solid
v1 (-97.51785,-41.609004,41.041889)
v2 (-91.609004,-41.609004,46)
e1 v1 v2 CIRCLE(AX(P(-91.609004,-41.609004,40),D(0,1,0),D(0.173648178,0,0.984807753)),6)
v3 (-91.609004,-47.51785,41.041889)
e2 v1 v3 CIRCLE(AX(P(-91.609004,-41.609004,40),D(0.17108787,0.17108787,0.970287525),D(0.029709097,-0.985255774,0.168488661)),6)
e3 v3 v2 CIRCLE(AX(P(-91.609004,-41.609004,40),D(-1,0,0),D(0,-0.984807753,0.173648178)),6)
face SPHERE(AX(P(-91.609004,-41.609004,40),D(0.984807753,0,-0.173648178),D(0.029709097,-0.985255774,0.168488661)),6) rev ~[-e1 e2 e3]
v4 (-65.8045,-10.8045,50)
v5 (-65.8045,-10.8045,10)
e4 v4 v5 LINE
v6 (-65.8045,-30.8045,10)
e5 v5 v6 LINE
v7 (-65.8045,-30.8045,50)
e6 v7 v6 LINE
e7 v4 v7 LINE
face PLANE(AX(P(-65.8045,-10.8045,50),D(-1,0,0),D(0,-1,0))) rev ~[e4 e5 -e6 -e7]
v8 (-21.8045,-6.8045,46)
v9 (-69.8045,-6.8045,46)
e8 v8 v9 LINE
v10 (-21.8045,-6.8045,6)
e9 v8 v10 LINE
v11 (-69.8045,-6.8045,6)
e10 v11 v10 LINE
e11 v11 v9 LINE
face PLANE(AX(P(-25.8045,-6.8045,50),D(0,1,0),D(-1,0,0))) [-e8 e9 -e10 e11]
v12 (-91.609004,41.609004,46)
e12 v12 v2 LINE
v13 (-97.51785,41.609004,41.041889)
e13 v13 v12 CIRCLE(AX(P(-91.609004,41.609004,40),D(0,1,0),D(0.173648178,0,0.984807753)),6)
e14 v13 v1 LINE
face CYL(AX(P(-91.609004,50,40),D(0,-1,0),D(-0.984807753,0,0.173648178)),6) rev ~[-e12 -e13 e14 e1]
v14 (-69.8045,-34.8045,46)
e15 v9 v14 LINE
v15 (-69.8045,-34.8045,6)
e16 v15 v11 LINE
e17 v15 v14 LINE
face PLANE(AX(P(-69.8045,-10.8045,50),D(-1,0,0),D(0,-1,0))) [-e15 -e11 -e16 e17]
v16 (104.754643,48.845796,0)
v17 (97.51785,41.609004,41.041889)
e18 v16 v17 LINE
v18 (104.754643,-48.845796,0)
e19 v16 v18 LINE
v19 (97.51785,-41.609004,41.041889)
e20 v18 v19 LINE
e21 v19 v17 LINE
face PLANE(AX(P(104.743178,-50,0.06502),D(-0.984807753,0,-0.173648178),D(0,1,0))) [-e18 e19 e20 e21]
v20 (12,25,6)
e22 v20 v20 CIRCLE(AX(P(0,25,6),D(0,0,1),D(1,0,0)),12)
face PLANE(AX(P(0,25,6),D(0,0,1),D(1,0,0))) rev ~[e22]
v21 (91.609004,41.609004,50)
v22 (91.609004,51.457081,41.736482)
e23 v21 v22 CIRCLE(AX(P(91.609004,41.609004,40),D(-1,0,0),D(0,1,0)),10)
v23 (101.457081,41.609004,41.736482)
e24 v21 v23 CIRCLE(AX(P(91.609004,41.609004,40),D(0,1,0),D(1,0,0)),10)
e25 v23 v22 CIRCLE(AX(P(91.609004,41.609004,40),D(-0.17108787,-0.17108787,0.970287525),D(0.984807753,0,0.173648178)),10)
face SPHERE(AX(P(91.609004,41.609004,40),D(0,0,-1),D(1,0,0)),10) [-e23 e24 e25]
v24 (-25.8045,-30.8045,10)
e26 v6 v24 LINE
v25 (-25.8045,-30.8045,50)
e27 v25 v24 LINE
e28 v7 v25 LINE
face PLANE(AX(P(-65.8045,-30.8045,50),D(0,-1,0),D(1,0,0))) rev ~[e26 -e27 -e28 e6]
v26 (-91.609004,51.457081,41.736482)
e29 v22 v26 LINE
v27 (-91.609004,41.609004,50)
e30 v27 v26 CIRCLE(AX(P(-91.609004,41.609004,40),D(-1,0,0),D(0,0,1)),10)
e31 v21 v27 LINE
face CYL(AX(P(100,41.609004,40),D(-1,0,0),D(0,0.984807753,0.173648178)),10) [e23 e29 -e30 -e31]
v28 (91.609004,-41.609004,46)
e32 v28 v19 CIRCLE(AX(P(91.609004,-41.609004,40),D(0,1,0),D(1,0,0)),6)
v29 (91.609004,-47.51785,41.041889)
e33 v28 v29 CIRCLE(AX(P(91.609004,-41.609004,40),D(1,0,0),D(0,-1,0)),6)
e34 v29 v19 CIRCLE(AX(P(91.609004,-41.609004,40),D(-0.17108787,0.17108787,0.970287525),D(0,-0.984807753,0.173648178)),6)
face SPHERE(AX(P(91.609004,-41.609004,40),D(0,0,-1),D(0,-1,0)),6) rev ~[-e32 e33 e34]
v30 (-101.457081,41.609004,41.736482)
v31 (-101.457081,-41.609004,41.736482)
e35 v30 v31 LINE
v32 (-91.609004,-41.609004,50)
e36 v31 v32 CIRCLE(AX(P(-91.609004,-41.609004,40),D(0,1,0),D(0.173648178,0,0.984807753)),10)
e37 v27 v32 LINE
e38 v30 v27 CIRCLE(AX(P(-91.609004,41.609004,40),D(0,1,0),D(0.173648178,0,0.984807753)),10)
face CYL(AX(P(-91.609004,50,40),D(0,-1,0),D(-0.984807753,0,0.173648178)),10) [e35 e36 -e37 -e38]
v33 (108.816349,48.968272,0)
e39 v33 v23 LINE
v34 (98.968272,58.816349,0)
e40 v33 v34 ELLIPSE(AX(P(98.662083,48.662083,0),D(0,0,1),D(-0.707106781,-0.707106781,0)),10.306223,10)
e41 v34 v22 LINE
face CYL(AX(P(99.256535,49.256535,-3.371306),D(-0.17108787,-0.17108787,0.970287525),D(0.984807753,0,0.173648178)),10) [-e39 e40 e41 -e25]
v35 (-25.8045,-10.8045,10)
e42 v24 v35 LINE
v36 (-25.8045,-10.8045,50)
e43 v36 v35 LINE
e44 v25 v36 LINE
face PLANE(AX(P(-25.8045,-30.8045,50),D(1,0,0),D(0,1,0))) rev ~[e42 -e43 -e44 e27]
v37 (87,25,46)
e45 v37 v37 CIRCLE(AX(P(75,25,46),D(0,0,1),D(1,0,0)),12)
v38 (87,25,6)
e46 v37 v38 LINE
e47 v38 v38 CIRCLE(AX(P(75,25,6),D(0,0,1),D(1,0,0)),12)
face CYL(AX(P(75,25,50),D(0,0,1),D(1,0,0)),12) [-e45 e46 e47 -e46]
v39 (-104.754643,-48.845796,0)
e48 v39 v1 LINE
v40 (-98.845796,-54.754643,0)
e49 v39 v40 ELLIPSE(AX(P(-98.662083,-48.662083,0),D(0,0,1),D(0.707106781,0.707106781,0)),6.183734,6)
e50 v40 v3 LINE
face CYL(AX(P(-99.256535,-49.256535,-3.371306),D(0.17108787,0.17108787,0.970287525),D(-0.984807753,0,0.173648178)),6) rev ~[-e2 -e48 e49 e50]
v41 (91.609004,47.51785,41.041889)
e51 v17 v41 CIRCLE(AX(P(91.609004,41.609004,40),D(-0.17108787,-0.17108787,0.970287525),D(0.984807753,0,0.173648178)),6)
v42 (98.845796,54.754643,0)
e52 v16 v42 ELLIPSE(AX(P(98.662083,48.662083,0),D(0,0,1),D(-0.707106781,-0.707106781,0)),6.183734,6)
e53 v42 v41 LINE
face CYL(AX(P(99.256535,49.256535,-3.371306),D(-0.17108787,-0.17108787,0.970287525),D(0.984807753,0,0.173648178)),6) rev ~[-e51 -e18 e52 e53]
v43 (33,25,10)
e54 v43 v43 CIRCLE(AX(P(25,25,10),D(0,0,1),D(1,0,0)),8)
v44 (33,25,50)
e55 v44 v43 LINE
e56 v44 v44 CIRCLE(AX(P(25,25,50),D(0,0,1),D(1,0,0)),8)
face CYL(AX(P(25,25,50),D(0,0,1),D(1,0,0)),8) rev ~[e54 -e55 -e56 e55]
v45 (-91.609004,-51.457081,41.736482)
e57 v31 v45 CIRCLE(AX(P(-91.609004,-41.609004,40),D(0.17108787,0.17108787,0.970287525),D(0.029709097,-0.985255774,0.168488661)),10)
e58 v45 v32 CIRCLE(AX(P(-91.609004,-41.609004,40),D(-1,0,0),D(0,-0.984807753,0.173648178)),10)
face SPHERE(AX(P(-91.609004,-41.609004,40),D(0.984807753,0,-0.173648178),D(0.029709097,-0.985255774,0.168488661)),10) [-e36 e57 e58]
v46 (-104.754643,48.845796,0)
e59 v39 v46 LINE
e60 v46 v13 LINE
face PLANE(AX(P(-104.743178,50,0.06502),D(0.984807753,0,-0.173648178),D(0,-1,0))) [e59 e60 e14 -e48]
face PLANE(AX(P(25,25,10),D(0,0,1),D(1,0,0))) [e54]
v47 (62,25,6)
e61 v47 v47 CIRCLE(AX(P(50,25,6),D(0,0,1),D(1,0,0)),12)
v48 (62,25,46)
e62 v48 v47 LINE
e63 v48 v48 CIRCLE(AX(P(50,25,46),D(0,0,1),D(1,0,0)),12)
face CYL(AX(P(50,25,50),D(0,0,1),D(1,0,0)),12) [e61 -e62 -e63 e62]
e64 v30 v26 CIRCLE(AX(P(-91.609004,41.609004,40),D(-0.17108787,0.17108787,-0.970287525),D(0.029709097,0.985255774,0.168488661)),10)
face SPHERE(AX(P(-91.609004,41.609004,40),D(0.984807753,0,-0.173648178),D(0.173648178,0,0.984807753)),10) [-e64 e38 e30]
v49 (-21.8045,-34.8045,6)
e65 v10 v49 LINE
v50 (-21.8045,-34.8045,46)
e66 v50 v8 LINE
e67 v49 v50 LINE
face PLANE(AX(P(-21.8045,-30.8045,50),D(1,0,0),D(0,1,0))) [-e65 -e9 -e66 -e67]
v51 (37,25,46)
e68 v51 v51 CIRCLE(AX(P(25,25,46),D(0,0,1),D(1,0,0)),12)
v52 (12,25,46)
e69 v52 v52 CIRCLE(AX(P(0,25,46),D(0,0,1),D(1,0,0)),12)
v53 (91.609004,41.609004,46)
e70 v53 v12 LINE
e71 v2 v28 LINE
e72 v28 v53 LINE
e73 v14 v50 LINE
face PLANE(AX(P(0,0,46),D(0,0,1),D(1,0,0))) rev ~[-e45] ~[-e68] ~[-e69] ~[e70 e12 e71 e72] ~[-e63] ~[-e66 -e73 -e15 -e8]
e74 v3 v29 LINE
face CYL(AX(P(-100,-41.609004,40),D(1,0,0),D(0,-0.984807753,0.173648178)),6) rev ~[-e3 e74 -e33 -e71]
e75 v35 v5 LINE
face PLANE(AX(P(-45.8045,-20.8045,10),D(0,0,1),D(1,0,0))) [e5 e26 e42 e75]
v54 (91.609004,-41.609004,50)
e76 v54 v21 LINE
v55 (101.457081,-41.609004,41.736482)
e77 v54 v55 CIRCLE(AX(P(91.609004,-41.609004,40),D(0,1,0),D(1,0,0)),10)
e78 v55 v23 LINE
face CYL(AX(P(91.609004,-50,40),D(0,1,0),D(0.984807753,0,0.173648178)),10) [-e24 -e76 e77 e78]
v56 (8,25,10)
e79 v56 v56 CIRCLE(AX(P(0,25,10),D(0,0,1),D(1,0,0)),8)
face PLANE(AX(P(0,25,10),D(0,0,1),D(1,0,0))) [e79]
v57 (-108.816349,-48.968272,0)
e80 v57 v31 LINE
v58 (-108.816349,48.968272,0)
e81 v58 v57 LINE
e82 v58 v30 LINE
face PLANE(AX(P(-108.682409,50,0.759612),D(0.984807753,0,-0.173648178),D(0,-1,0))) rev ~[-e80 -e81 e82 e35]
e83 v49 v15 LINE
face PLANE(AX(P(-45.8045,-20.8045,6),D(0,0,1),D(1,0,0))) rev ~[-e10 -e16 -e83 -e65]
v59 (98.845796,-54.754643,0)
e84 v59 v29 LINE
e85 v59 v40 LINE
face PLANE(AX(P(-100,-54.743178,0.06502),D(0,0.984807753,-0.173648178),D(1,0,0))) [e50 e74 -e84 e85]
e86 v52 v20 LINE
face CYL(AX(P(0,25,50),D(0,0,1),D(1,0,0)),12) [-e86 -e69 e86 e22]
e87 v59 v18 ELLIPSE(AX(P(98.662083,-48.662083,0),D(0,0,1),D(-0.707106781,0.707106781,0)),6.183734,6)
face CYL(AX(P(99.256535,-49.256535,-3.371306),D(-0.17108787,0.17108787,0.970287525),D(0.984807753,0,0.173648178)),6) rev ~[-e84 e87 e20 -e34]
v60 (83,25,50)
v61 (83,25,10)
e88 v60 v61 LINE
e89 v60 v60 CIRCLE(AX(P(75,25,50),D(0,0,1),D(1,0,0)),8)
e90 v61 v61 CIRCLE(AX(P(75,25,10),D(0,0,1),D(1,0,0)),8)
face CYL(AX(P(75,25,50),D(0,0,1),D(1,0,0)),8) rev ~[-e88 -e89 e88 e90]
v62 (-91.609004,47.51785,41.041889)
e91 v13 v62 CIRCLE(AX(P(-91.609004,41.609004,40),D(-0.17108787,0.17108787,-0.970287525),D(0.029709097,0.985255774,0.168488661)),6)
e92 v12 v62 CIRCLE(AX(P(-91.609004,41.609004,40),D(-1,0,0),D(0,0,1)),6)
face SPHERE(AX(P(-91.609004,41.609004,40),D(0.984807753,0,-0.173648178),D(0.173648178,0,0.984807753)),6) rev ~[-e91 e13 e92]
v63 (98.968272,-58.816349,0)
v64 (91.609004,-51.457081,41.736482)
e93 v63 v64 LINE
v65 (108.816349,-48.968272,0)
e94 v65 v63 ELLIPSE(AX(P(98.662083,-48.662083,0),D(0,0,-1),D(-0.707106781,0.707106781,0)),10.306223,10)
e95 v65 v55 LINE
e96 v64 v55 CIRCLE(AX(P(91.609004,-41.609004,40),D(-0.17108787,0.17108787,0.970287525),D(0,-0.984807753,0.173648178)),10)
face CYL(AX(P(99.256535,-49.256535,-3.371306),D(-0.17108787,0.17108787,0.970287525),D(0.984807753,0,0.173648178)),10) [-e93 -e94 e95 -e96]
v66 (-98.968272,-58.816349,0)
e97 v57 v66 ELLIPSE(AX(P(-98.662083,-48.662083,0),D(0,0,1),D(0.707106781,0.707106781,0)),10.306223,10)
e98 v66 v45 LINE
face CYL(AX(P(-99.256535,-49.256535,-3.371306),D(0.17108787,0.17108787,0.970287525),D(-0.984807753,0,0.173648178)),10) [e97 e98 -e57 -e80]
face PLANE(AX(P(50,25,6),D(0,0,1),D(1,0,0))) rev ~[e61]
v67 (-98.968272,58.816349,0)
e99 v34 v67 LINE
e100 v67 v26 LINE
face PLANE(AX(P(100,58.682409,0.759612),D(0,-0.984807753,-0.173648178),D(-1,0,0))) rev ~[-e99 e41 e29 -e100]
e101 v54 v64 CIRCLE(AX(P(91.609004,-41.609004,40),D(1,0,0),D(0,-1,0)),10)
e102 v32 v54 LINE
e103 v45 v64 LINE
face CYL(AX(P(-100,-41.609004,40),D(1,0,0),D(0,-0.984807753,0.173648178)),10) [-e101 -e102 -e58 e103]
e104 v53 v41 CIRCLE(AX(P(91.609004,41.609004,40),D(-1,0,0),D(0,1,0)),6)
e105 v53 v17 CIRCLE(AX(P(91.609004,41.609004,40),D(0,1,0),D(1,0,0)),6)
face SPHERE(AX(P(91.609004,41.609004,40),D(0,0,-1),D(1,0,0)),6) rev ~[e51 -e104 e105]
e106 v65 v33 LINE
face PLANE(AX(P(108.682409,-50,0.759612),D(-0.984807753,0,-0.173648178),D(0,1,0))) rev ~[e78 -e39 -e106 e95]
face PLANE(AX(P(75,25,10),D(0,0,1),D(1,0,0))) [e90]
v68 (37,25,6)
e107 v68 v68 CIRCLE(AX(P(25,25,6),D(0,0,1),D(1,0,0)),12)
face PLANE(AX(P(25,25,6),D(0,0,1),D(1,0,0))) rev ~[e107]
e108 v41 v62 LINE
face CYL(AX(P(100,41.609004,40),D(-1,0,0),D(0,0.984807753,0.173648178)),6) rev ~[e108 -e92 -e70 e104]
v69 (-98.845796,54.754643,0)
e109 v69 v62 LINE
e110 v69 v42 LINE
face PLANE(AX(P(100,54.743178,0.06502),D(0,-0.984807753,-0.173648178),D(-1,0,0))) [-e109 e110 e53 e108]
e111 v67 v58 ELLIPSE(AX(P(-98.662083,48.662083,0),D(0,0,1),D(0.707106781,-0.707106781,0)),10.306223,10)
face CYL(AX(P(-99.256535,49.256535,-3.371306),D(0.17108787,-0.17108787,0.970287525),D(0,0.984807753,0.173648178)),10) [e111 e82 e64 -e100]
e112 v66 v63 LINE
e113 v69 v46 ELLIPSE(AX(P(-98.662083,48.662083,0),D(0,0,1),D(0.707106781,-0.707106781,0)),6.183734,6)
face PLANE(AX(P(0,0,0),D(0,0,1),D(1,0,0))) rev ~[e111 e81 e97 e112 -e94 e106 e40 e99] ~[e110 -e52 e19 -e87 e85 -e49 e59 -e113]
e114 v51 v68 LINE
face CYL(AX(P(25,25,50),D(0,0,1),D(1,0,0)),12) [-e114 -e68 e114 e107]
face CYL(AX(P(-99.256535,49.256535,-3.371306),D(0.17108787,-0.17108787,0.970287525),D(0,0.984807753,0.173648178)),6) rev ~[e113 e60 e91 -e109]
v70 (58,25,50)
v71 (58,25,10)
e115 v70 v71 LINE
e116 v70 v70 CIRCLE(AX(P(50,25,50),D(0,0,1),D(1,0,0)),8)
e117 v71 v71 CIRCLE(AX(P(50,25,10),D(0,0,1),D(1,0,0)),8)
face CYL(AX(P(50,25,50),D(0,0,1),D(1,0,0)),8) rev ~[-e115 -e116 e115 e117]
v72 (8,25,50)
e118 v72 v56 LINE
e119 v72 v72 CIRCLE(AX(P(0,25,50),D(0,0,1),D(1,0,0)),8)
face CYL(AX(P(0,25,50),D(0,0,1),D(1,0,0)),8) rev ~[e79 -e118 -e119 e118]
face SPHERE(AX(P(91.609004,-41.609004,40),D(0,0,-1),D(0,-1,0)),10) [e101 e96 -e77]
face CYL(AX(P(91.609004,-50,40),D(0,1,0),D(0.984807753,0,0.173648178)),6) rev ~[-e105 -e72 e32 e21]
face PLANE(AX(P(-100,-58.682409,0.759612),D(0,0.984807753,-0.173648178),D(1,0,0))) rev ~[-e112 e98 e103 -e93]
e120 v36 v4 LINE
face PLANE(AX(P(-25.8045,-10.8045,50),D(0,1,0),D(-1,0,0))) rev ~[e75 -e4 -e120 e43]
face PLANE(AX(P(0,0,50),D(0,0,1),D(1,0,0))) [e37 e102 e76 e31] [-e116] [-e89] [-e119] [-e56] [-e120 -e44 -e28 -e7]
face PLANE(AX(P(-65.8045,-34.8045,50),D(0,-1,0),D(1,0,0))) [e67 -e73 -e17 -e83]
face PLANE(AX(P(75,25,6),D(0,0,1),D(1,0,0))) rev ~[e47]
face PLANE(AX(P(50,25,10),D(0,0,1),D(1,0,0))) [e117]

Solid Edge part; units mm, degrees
sketch "Sketch1" plane through (0, 0, 0) normal (0, 0, 1) x (1, 0, 0)
  line L0 (100, -50) -> (100, 50)
  line L1 (100, 50) -> (-100, 50)
  line L2 (-100, 50) -> (-100, -50)
  line L3 (-100, -50) -> (100, -50)
extrude "Protrusion1" add sketch "Sketch1" along normal blind 50
draft "Draft_1" angle 10 neutral plane through (0, 0, 50) normal (0, 0, 1) pull direction (0, 0, 1) face at (-68.6667, -50, 41.1667) face at (100, -34.3333, 41.1667) face at (68.6667, 50, 41.1667) face at (-100, 34.3333, 41.1667)
fillet "Round_1" radius 10 8 edges at (104.4082, -54.4082, 25) (104.4082, 54.4082, 25) (0, -50, 50) (100, 0, 50) (0, 50, 50) (-104.4082, -54.4082, 25) (-100, 0, 50) (-104.4082, 54.4082, 25)
sketch "Sketch2" plane through (0, 0, 50) normal (0, 0, 1) x (1, 0, 0)
  line L0 (-25.8045, -10.8045) -> (-65.8045, -10.8045)
  line L1 (-65.8045, -10.8045) -> (-65.8045, -30.8045)
  line L2 (-65.8045, -30.8045) -> (-25.8045, -30.8045)
  line L3 (-25.8045, -30.8045) -> (-25.8045, -10.8045)
  circle A0 centre (0, 25) radius 8
  circle A1 centre (25, 25) radius 8
  circle A2 centre (50, 25) radius 8
  circle A3 centre (75, 25) radius 8
extrude "Cutout_1" cut sketch "Sketch2" against normal blind 40
shell "Thin_Wall_1" thickness 4 removed faces 1 at (-74.7206, -38.0346, 0)
